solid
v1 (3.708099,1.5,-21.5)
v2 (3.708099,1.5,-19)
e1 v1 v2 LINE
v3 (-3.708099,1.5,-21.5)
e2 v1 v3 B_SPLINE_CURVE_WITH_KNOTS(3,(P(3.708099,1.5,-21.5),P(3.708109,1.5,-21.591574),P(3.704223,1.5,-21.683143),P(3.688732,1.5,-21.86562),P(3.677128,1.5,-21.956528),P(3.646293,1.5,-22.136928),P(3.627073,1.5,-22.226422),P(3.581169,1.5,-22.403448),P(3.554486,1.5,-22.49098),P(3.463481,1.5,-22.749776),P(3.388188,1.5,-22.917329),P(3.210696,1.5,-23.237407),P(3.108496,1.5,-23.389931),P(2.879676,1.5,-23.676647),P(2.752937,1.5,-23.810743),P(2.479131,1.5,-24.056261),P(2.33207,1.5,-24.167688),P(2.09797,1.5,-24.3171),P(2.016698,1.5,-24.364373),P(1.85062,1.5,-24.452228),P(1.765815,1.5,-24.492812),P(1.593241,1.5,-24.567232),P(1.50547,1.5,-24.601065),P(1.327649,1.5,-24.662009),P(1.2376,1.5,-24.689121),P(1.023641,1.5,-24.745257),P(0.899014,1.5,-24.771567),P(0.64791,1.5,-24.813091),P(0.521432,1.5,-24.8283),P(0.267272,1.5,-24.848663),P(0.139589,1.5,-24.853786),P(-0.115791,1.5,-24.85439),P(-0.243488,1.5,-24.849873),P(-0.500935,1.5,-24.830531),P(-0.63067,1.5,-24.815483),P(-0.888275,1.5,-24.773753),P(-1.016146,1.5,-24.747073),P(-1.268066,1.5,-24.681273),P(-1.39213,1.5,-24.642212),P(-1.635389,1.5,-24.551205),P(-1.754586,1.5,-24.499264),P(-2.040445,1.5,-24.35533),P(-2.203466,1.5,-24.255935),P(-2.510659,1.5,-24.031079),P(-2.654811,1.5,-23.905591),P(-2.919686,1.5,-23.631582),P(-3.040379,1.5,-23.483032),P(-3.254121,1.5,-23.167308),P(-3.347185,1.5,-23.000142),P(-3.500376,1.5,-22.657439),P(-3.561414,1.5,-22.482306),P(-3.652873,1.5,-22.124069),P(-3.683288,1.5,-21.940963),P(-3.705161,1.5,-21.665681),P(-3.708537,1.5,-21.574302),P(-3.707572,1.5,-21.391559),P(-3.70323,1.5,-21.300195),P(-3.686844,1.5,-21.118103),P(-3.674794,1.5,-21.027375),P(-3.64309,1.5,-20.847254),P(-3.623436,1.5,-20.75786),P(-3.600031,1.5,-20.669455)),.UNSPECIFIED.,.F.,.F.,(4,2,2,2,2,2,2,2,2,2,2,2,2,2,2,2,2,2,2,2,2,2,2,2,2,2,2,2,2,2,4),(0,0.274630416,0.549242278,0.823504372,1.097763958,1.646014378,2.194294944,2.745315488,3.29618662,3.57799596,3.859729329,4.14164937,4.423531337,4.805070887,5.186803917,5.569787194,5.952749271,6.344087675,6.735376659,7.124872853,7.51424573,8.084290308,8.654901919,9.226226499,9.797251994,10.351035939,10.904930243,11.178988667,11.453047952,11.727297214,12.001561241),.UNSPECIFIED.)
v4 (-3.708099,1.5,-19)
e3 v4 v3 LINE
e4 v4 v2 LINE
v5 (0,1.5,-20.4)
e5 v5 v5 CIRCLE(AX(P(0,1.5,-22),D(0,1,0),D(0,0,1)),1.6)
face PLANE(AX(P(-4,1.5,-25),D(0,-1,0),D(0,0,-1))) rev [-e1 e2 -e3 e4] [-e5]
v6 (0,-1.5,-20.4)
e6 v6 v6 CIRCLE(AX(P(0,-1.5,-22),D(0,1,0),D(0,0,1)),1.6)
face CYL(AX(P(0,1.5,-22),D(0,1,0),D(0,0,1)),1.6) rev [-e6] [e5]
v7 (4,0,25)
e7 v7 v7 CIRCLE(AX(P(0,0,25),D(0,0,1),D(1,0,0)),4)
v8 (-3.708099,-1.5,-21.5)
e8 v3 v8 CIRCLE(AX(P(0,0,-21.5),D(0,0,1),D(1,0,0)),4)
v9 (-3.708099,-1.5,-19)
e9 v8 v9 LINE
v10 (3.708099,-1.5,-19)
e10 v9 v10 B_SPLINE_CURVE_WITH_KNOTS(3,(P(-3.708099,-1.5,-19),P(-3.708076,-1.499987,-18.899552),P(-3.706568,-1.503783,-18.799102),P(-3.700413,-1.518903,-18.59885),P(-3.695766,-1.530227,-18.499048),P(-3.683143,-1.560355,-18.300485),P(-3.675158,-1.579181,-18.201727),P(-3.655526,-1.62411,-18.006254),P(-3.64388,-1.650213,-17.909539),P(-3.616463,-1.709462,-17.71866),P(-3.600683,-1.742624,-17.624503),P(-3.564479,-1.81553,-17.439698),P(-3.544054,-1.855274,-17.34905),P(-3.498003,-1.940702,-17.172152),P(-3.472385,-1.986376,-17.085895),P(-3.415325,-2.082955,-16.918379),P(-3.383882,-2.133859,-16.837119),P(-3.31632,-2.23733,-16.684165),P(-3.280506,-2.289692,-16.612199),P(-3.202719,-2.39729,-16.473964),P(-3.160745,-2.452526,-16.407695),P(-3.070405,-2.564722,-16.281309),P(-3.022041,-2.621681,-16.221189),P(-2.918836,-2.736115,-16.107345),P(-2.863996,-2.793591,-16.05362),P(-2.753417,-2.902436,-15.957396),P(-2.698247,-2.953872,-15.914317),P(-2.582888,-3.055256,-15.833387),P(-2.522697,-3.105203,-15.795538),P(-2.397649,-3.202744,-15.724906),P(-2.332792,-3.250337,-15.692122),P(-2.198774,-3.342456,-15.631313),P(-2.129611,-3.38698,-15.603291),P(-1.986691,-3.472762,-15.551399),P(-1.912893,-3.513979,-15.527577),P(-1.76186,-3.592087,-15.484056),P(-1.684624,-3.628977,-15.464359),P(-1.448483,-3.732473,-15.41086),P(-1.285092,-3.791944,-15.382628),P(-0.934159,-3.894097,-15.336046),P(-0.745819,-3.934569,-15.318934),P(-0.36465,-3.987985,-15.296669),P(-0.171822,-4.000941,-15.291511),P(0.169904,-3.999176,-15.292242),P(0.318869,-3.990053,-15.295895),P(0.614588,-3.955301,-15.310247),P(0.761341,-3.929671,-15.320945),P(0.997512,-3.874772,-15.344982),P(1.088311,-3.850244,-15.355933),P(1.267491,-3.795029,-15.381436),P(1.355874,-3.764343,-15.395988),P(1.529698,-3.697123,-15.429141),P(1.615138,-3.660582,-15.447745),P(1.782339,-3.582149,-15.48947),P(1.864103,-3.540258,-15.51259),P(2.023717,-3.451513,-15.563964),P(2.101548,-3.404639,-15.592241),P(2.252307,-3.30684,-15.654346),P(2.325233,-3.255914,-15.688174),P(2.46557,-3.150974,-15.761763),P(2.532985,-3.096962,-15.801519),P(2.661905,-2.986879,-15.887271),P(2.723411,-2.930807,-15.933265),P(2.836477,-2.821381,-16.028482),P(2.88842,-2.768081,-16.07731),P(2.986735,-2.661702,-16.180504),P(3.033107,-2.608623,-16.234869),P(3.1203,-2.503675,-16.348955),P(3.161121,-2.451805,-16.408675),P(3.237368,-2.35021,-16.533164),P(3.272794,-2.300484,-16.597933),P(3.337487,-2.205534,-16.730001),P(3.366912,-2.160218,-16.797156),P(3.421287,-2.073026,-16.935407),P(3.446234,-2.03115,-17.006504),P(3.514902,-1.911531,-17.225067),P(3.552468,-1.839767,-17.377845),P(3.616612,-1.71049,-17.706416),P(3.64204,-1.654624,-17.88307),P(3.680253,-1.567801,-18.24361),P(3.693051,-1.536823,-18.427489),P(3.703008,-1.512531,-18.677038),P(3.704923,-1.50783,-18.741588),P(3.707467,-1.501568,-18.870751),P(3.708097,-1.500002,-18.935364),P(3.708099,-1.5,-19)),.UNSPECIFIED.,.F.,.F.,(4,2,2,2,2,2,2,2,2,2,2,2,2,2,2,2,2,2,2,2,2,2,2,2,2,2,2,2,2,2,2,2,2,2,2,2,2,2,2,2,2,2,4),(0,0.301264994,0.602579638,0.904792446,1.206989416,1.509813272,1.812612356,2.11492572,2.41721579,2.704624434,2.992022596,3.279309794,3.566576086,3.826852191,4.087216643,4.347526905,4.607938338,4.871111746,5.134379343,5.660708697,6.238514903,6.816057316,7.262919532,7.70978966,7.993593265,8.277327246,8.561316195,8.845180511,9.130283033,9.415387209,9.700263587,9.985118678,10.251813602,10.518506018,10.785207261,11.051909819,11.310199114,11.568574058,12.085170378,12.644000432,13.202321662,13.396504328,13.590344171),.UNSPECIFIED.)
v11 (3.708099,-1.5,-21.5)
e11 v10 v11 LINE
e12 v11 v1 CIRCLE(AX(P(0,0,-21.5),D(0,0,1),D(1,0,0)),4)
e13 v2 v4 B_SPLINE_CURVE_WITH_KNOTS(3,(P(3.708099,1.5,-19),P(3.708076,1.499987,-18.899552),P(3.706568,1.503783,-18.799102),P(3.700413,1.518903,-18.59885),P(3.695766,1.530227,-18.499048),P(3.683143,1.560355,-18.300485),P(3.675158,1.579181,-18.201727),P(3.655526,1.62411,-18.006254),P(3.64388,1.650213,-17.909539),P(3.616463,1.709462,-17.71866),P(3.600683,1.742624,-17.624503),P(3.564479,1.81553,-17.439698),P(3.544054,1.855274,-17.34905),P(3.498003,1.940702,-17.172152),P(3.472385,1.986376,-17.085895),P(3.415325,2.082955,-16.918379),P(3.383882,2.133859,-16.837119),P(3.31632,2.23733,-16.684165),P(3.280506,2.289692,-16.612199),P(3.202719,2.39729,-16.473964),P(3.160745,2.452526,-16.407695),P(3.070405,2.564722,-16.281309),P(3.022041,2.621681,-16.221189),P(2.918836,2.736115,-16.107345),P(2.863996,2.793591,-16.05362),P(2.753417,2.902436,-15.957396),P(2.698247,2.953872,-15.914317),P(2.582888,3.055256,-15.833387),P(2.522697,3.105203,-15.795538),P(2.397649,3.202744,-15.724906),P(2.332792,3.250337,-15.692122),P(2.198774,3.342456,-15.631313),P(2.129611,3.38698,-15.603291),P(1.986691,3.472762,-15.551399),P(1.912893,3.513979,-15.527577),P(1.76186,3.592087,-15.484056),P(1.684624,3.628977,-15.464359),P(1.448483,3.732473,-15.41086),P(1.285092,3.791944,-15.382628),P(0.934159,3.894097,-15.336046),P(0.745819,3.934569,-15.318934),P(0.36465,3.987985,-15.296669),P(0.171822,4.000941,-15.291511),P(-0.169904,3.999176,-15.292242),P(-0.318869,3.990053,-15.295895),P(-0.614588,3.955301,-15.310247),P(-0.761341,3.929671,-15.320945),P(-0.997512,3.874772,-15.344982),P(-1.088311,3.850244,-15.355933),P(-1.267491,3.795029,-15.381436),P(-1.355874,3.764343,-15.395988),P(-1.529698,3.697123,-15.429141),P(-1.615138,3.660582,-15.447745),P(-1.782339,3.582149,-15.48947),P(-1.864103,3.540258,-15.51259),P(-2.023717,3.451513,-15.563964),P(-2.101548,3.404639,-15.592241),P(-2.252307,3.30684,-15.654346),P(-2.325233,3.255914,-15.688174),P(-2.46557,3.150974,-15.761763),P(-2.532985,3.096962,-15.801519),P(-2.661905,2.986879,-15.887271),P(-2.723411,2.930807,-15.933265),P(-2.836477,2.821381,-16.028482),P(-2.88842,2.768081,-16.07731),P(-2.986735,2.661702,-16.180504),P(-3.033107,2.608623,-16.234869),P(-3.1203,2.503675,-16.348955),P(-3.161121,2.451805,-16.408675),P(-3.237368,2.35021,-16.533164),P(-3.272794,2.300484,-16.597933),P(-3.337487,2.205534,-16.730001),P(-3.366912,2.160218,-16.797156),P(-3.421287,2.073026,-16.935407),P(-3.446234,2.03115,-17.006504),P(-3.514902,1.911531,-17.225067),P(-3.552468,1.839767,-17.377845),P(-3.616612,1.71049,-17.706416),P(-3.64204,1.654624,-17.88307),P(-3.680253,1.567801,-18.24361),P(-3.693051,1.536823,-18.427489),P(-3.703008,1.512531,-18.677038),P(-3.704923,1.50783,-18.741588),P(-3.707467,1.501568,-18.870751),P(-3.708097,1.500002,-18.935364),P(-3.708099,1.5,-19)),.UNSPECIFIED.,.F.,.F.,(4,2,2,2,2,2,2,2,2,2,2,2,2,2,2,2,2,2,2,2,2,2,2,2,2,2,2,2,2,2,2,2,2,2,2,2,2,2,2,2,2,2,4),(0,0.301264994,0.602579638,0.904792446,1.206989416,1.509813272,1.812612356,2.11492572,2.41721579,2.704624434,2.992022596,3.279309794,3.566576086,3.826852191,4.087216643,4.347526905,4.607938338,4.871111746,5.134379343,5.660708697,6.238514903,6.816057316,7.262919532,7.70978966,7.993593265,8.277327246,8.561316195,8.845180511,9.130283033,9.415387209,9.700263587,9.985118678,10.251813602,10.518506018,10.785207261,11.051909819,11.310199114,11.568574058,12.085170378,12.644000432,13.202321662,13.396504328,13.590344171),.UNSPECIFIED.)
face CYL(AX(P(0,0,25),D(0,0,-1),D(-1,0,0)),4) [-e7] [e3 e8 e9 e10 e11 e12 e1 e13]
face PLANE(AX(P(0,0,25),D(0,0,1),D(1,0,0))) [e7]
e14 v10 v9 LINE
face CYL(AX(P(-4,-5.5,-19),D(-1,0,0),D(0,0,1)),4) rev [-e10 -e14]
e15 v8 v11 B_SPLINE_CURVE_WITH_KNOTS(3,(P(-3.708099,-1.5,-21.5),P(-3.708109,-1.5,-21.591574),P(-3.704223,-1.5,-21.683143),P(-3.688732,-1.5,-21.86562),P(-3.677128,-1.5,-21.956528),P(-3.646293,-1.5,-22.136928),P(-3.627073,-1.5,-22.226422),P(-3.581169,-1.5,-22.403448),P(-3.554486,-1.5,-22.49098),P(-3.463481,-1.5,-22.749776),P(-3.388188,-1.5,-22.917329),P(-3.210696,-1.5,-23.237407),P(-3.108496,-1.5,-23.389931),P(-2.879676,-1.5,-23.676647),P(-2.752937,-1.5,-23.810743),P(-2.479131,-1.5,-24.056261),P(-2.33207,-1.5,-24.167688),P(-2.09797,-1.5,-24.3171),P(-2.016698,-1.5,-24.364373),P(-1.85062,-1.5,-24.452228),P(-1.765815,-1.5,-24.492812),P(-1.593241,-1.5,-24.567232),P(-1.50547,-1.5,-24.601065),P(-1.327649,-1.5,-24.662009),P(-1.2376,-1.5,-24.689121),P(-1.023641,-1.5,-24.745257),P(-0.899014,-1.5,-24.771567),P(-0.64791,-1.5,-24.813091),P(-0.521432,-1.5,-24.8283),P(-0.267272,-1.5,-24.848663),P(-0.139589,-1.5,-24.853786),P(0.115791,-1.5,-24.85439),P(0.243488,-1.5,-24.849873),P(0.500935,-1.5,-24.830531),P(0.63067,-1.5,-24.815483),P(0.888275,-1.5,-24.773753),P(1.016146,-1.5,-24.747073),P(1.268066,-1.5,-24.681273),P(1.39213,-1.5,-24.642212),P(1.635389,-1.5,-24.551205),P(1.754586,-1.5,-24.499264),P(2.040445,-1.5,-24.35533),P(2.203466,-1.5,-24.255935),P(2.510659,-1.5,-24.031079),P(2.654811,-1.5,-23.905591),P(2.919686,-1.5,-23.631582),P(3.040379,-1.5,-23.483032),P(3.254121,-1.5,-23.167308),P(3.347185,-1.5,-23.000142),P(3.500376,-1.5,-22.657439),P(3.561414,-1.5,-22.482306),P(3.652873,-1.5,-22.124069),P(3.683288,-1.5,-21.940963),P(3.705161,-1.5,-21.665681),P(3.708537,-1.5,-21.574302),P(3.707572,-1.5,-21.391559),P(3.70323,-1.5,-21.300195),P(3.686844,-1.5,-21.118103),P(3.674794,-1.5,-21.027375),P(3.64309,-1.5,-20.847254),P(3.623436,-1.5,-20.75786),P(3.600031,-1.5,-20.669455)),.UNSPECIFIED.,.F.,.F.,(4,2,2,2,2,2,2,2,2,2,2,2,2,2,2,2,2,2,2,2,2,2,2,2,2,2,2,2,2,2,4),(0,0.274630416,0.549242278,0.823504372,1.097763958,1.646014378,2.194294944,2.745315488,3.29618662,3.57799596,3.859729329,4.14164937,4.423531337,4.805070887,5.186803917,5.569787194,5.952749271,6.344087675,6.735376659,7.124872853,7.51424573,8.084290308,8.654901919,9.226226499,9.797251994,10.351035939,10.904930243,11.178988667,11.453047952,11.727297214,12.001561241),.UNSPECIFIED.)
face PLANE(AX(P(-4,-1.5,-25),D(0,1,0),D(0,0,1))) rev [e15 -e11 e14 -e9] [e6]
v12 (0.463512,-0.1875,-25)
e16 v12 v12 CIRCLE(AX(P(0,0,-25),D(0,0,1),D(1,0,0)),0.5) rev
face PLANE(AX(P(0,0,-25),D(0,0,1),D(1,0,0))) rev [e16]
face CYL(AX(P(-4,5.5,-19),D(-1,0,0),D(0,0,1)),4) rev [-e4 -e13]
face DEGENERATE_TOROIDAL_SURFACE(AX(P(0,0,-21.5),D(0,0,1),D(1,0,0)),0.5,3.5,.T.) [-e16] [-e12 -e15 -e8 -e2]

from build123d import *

# Parameters (mm, degrees)
SKETCH1_R               = 4
BOSS_EXTRUDE1_DEPTH     = 25
CUT_EXTRUDE1_DEPTH      = 26.632011236
CUT_EXTRUDE1_DEPTH_BACK = 26.632011236
SKETCH2_W               = 10
SKETCH2_H               = 2.5
FILLET1_R               = 4
M3_CLEARANCE_HOLE1_D    = 3.2
FILLET2_R               = 3.5


with BuildPart() as part:
    # Sketch1 → Boss-Extrude1 (new, symmetric)
    with BuildSketch(Plane.XY):
        Circle(SKETCH1_R)
    extrude(amount=BOSS_EXTRUDE1_DEPTH, both=True)

    # Sketch2 → Cut-Extrude1 (cut, two sides: drawn at the far end of the back side and taken through both)
    with BuildSketch(Plane(origin=(0, 0, 0), x_dir=(0, 0, -1), z_dir=(1, 0, 0)).offset(-CUT_EXTRUDE1_DEPTH_BACK)):
        with Locations((20, -2.75)):
            Rectangle(SKETCH2_W, SKETCH2_H)
        with Locations((20, 2.75)):
            Rectangle(SKETCH2_W, SKETCH2_H)
    extrude(amount=CUT_EXTRUDE1_DEPTH + CUT_EXTRUDE1_DEPTH_BACK, mode=Mode.SUBTRACT)

    # Fillet1
    # the kernel refuses this fillet: 4 mm, written as the material it adds along each edge
    with BuildSketch(Plane(origin=(13.708099244, -1.5, -15), x_dir=(0, -1, 0), z_dir=(-1, 0, 0))) as fillet1_piece_1_section:
        with BuildLine():
            CenterArc((FILLET1_R, -FILLET1_R), FILLET1_R, 90, 90)
            Line((0, -FILLET1_R), (0, 0))
            Line((0, 0), (FILLET1_R, 0))
        make_face()
    fillet1_piece_1 = extrude(amount=27.416198487, mode=Mode.PRIVATE)
    fillet1_piece_1 = fillet1_piece_1 & Plane(origin=(0, 0, -16.053491098), x_dir=(1, 0, 0), z_dir=(0, 0, 1)) * Cylinder(4, 71, mode=Mode.PRIVATE)
    add(fillet1_piece_1)
    with BuildSketch(Plane(origin=(-13.708099244, 1.5, -15), x_dir=(0, 1, 0), z_dir=(1, 0, 0))) as fillet1_piece_2_section:
        with BuildLine():
            CenterArc((FILLET1_R, -FILLET1_R), FILLET1_R, 90, 90)
            Line((0, -FILLET1_R), (0, 0))
            Line((0, 0), (FILLET1_R, 0))
        make_face()
    fillet1_piece_2 = extrude(amount=27.416198487, mode=Mode.PRIVATE)
    fillet1_piece_2 = fillet1_piece_2 & Plane(origin=(0, 0, -16.053491097), x_dir=(1, 0, 0), z_dir=(0, 0, 1)) * Cylinder(4, 71, mode=Mode.PRIVATE)
    add(fillet1_piece_2)

    # M3 Clearance Hole1 (through all)
    with Locations(Plane(origin=(0, 1.5, 0), x_dir=(1, 0, 0), z_dir=(0, 1, 0))):
        with Locations((0, 22)):
            Hole(M3_CLEARANCE_HOLE1_D / 2)

    # Fillet2
    # the kernel refuses this fillet: 3.5 mm, written as the material it takes off along each edge
    with BuildSketch(Plane(origin=(0, 0, -25), x_dir=(1, 0, 0), z_dir=(0, -1, 0))) as fillet2_piece_1:
        with BuildLine():
            CenterArc((4 - FILLET2_R, FILLET2_R), FILLET2_R, 270, 90)
            Line((4 - FILLET2_R, 0), (4, 0))
            Line((4, 0), (4, FILLET2_R))
        make_face()
    revolve(axis=Axis((0, 0, -25), (0, 0, 1)), revolution_arc=147.36184482, mode=Mode.SUBTRACT)
    with BuildSketch(Plane(origin=(0, 0, -25), x_dir=(0.842178541761355, 0.5391987609376692, 0), z_dir=(0.5391987609376692, -0.842178541761355, 0))) as fillet2_piece_2:
        with BuildLine():
            CenterArc((4 - FILLET2_R, FILLET2_R), FILLET2_R, 270, 90)
            Line((4 - FILLET2_R, 0), (4, 0))
            Line((4, 0), (4, FILLET2_R))
        make_face()
    revolve(axis=Axis((0, 0, -25), (0, 0, 1)), revolution_arc=294.74177665, mode=Mode.SUBTRACT)
    with BuildSketch(Plane(origin=(0, 0, -25), x_dir=(-0.8420934247140166, -0.5393316827828853, 0), z_dir=(-0.5393316827828853, 0.8420934247140166, 0))) as fillet2_piece_3:
        with BuildLine():
            CenterArc((4 - FILLET2_R, FILLET2_R), FILLET2_R, 270, 90)
            Line((4 - FILLET2_R, 0), (4, 0))
            Line((4, 0), (4, FILLET2_R))
        make_face()
    revolve(axis=Axis((0, 0, -25), (0, 0, 1)), revolution_arc=147.36184482, mode=Mode.SUBTRACT)


solid = part.part
